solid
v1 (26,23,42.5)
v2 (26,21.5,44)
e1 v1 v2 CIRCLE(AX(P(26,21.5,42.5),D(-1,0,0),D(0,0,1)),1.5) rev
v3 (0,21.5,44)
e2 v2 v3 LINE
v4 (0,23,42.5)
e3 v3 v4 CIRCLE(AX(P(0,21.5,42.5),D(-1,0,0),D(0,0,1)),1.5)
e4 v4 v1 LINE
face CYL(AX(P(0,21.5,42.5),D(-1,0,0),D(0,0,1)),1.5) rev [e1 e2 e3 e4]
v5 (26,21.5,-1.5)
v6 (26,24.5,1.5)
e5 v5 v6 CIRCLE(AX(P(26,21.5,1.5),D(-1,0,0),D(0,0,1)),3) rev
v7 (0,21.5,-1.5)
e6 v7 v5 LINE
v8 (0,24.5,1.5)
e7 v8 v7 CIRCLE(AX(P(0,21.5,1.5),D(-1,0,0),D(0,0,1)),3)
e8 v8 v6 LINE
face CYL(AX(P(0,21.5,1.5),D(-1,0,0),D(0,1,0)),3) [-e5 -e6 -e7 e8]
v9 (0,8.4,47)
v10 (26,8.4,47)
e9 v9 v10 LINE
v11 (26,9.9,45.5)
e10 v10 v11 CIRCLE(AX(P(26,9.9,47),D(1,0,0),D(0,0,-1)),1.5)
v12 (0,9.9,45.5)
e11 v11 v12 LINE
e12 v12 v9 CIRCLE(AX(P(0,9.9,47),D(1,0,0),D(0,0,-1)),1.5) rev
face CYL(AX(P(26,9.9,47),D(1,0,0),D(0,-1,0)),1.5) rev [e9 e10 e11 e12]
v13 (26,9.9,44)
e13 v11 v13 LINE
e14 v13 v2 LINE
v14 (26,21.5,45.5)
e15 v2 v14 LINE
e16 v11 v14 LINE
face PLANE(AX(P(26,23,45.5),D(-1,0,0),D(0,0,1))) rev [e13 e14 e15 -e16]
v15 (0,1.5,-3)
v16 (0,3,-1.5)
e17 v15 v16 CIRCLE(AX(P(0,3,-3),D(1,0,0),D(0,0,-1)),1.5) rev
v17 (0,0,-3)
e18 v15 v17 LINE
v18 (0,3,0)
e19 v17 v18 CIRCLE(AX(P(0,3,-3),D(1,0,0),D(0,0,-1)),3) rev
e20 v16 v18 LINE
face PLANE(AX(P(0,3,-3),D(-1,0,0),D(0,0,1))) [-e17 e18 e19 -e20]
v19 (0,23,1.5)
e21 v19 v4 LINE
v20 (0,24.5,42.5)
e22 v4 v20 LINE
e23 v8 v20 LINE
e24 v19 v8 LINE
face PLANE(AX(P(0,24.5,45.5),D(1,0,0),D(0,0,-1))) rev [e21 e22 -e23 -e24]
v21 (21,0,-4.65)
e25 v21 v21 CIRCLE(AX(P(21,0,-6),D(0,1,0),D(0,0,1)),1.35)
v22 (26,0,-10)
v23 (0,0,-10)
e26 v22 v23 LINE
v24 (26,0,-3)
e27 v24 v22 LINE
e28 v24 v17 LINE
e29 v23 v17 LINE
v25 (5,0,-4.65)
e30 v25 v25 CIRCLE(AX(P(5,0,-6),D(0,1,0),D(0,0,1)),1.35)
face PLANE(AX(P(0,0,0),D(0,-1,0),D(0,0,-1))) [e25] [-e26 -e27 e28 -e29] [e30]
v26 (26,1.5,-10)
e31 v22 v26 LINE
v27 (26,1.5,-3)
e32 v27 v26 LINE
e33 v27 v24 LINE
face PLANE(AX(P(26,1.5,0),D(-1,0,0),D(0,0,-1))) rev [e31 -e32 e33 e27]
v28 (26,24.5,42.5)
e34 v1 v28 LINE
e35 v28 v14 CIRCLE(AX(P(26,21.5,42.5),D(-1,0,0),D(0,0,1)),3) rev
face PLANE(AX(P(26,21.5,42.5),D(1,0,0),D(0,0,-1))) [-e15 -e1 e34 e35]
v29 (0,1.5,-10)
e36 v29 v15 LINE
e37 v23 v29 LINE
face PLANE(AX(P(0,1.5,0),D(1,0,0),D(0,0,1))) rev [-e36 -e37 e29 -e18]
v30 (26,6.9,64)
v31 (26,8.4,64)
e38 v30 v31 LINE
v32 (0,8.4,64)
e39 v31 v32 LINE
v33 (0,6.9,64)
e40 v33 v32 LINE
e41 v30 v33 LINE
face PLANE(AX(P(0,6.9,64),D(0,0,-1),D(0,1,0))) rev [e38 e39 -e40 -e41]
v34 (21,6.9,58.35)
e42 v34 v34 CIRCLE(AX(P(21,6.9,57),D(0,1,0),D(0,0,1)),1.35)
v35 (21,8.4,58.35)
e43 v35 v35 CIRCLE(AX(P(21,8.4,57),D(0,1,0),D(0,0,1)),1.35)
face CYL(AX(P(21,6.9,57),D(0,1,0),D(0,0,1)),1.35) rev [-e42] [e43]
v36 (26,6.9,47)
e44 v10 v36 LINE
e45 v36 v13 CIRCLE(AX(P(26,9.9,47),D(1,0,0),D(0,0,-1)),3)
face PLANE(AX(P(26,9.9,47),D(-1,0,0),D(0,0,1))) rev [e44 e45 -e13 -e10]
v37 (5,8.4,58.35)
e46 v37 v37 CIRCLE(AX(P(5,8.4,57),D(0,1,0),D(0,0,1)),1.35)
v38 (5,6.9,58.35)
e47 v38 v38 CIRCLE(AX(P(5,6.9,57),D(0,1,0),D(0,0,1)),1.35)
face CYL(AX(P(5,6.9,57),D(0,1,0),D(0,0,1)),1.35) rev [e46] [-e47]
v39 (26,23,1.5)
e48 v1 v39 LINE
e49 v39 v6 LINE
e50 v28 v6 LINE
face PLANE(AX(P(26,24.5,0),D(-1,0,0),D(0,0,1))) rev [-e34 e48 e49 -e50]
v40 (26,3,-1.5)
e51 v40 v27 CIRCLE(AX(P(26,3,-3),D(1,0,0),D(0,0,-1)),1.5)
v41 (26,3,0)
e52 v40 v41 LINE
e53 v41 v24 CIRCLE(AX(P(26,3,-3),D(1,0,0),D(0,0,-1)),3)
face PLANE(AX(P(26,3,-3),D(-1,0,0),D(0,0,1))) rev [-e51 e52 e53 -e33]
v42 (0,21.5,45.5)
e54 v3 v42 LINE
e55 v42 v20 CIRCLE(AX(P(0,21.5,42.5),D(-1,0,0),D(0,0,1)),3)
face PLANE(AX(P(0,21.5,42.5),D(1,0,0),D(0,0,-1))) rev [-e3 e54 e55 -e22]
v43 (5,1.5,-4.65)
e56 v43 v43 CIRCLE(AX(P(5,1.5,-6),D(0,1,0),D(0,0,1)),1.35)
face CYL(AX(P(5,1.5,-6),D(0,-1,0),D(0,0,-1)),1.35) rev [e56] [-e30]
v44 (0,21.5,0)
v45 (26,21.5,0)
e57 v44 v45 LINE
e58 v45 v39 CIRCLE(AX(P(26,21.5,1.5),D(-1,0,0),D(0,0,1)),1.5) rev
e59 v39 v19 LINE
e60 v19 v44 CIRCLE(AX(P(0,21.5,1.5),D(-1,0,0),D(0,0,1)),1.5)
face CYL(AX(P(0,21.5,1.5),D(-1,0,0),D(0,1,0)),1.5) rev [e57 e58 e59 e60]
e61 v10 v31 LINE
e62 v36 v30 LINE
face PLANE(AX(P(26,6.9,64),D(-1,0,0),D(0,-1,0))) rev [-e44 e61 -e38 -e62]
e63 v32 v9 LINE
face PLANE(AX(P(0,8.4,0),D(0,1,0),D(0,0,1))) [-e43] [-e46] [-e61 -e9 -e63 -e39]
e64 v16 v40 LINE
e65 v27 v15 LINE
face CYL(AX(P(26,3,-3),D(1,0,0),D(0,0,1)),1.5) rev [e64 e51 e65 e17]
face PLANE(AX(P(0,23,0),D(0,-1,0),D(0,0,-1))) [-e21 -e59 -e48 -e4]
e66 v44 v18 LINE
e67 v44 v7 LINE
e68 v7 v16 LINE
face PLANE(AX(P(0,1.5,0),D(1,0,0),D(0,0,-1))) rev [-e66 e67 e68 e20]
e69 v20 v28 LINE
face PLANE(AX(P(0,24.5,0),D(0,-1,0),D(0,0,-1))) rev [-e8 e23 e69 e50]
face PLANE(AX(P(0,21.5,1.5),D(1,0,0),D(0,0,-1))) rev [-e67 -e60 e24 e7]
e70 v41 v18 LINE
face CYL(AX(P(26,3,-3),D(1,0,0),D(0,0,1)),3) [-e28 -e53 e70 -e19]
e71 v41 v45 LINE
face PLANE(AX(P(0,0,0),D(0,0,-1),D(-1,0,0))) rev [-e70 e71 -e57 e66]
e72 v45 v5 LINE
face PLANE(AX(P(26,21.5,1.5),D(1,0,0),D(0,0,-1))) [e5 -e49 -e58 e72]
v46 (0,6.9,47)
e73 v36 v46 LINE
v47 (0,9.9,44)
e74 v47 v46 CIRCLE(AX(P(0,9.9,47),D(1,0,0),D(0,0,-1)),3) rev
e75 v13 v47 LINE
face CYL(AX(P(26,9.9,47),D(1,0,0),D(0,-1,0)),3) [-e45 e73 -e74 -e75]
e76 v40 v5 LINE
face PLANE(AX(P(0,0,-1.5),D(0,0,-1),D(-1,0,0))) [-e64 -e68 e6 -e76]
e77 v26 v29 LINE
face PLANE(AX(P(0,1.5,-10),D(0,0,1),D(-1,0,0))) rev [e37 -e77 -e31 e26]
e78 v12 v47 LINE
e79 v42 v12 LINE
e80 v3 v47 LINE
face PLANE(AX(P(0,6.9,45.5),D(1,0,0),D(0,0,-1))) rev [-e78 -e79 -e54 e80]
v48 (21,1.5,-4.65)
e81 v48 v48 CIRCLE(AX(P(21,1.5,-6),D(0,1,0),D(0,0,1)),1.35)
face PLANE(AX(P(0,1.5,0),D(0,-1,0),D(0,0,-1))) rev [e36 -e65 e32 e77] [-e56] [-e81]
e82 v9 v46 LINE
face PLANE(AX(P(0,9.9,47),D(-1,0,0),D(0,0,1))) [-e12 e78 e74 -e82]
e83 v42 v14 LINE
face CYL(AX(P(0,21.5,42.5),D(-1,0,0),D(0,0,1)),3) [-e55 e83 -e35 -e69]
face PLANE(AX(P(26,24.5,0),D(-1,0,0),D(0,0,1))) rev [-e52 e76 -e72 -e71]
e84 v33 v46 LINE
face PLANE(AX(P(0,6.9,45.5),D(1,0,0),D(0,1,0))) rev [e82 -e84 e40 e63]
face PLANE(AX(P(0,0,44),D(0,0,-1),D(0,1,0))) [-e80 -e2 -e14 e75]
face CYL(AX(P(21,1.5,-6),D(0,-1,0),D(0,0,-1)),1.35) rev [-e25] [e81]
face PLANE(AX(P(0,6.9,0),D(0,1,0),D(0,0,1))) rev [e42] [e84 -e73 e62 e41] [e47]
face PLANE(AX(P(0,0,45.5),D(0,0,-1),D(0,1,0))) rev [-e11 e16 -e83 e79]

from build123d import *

# Parameters (mm, degrees)
SKETCH_1_W                       = 26
SKETCH_1_H                       = 10
SKETCH_1_R                       = 1.35
EXTRUDE_1_DEPTH                  = 1.5
SM_EDGE_FLANGE_1_STRIP_W         = 9
SM_EDGE_FLANGE_1_STRIP_H         = 1.5
SM_EDGE_FLANGE_1_STRIP_CUT_DEPTH = 26
SM_EDGE_FLANGE_1_DEPTH           = 26
SM_EDGE_FLANGE_2_STRIP_W         = 9
SM_EDGE_FLANGE_2_STRIP_H         = 1.5
SM_EDGE_FLANGE_2_STRIP_CUT_DEPTH = 26
SM_EDGE_FLANGE_2_DEPTH           = 26
SM_EDGE_FLANGE_3_STRIP_W         = 9
SM_EDGE_FLANGE_3_STRIP_H         = 1.5
SM_EDGE_FLANGE_3_STRIP_CUT_DEPTH = 26
SM_EDGE_FLANGE_3_DEPTH           = 26
SM_EDGE_FLANGE_4_STRIP_W         = 9
SM_EDGE_FLANGE_4_STRIP_H         = 1.5
SM_EDGE_FLANGE_4_STRIP_CUT_DEPTH = 26
SM_EDGE_FLANGE_4_DEPTH           = 26
SKETCH_22_R                      = 1.35
CUT_EXTRUDE_1_DEPTH              = 1.5


# Sheet-metal steps are written as plain solids
with BuildPart() as part:
    # Sketch 1 → Бобышка-Вытянуть1 (new body)
    with BuildSketch(Plane(origin=(0, 0, 0), x_dir=(1, 0, 0), z_dir=(0, 1, 0))):
        with Locations((13, 5)):
            Rectangle(SKETCH_1_W, SKETCH_1_H)
        with Locations(Location((5, 6, 0), (0, 0, 270))):
            Circle(SKETCH_1_R, mode=Mode.SUBTRACT)
        with Locations(Location((21, 6, 0), (0, 0, 270))):
            Circle(SKETCH_1_R, mode=Mode.SUBTRACT)
    extrude(amount=EXTRUDE_1_DEPTH)

    # Ребро-кромка1 strip (across the edge) → Ребро-кромка1 strip cut (cut)
    with BuildSketch(Plane(origin=(0, 1.5, 0), x_dir=(0, 0, -1), z_dir=(1, 0, 0))):
        with Locations((-1.5, -0.75)):
            Rectangle(SM_EDGE_FLANGE_1_STRIP_W, SM_EDGE_FLANGE_1_STRIP_H)
    extrude(amount=SM_EDGE_FLANGE_1_STRIP_CUT_DEPTH, mode=Mode.SUBTRACT)

    # Ребро-кромка1 section (across the edge) → Ребро-кромка1 (add)
    with BuildSketch(Plane(origin=(0, 1.5, 0), x_dir=(0, 0, -1), z_dir=(1, 0, 0))):
        with BuildLine():
            Line((0, 1.5), (0, 23))
            Line((0, 23), (1.5, 23))
            Line((1.5, 23), (1.5, 1.5))
            ThreePointArc((1.5, 1.5), (1.939339828, 0.439339828), (3, 0))
            Line((3, 0), (3, -1.5))
            ThreePointArc((3, -1.5), (0.878679656, -0.621320344), (0, 1.5))
        make_face()
    extrude(amount=SM_EDGE_FLANGE_1_DEPTH)

    # Ребро-кромка2 strip (across the edge) → Ребро-кромка2 strip cut (cut)
    with BuildSketch(Plane(origin=(26, 24.5, 0), x_dir=(0, -1, 0), z_dir=(-1, 0, 0))):
        with Locations((-1.5, -0.75)):
            Rectangle(SM_EDGE_FLANGE_2_STRIP_W, SM_EDGE_FLANGE_2_STRIP_H)
    extrude(amount=SM_EDGE_FLANGE_2_STRIP_CUT_DEPTH, mode=Mode.SUBTRACT)

    # Ребро-кромка2 section (across the edge) → Ребро-кромка2 (add)
    with BuildSketch(Plane(origin=(26, 24.5, 0), x_dir=(0, -1, 0), z_dir=(-1, 0, 0))):
        with BuildLine():
            Line((0, 1.5), (0, 45.5))
            Line((0, 45.5), (1.5, 45.5))
            Line((1.5, 45.5), (1.5, 1.5))
            ThreePointArc((1.5, 1.5), (1.939339828, 0.439339828), (3, 0))
            Line((3, 0), (3, -1.5))
            ThreePointArc((3, -1.5), (0.878679656, -0.621320344), (0, 1.5))
        make_face()
    extrude(amount=SM_EDGE_FLANGE_2_DEPTH)

    # Ребро-кромка3 strip (across the edge) → Ребро-кромка3 strip cut (cut)
    with BuildSketch(Plane(origin=(26, 23, 45.5), x_dir=(0, 0, -1), z_dir=(-1, 0, 0))):
        with Locations((-1.5, -0.75)):
            Rectangle(SM_EDGE_FLANGE_3_STRIP_W, SM_EDGE_FLANGE_3_STRIP_H)
    extrude(amount=SM_EDGE_FLANGE_3_STRIP_CUT_DEPTH, mode=Mode.SUBTRACT)

    # Ребро-кромка3 section (across the edge) → Ребро-кромка3 (add)
    with BuildSketch(Plane(origin=(26, 23, 45.5), x_dir=(0, 0, -1), z_dir=(-1, 0, 0))):
        with BuildLine():
            Line((0, 1.5), (0, 16.1))
            Line((0, 16.1), (1.5, 16.1))
            Line((1.5, 16.1), (1.5, 1.5))
            ThreePointArc((1.5, 1.5), (1.939339828, 0.439339828), (3, 0))
            Line((3, 0), (3, -1.5))
            ThreePointArc((3, -1.5), (0.878679656, -0.621320344), (0, 1.5))
        make_face()
    extrude(amount=SM_EDGE_FLANGE_3_DEPTH)

    # Ребро-кромка4 strip (across the edge) → Ребро-кромка4 strip cut (cut)
    with BuildSketch(Plane(origin=(0, 6.9, 45.5), x_dir=(0, 1, 0), z_dir=(1, 0, 0))):
        with Locations((-1.5, -0.75)):
            Rectangle(SM_EDGE_FLANGE_4_STRIP_W, SM_EDGE_FLANGE_4_STRIP_H)
    extrude(amount=SM_EDGE_FLANGE_4_STRIP_CUT_DEPTH, mode=Mode.SUBTRACT)

    # Ребро-кромка4 section (across the edge) → Ребро-кромка4 (add)
    with BuildSketch(Plane(origin=(0, 6.9, 45.5), x_dir=(0, 1, 0), z_dir=(1, 0, 0))):
        with BuildLine():
            Line((0, 1.5), (0, 18.5))
            Line((0, 18.5), (1.5, 18.5))
            Line((1.5, 18.5), (1.5, 1.5))
            ThreePointArc((1.5, 1.5), (1.939339828, 0.439339828), (3, 0))
            Line((3, 0), (3, -1.5))
            ThreePointArc((3, -1.5), (0.878679656, -0.621320344), (0, 1.5))
        make_face()
    extrude(amount=SM_EDGE_FLANGE_4_DEPTH)

    # Эскиз22 → Вырез-Вытянуть1 (cut)
    with BuildSketch(Plane(origin=(0, 8.4, 0), x_dir=(1, 0, 0), z_dir=(0, 1, 0))):
        with Locations(Location((5, -57, 0), (0, 0, 270))):
            Circle(SKETCH_22_R)
        with Locations(Location((21, -57, 0), (0, 0, 270))):
            Circle(SKETCH_22_R)
    extrude(amount=-CUT_EXTRUDE_1_DEPTH, mode=Mode.SUBTRACT)


solid = part.part
